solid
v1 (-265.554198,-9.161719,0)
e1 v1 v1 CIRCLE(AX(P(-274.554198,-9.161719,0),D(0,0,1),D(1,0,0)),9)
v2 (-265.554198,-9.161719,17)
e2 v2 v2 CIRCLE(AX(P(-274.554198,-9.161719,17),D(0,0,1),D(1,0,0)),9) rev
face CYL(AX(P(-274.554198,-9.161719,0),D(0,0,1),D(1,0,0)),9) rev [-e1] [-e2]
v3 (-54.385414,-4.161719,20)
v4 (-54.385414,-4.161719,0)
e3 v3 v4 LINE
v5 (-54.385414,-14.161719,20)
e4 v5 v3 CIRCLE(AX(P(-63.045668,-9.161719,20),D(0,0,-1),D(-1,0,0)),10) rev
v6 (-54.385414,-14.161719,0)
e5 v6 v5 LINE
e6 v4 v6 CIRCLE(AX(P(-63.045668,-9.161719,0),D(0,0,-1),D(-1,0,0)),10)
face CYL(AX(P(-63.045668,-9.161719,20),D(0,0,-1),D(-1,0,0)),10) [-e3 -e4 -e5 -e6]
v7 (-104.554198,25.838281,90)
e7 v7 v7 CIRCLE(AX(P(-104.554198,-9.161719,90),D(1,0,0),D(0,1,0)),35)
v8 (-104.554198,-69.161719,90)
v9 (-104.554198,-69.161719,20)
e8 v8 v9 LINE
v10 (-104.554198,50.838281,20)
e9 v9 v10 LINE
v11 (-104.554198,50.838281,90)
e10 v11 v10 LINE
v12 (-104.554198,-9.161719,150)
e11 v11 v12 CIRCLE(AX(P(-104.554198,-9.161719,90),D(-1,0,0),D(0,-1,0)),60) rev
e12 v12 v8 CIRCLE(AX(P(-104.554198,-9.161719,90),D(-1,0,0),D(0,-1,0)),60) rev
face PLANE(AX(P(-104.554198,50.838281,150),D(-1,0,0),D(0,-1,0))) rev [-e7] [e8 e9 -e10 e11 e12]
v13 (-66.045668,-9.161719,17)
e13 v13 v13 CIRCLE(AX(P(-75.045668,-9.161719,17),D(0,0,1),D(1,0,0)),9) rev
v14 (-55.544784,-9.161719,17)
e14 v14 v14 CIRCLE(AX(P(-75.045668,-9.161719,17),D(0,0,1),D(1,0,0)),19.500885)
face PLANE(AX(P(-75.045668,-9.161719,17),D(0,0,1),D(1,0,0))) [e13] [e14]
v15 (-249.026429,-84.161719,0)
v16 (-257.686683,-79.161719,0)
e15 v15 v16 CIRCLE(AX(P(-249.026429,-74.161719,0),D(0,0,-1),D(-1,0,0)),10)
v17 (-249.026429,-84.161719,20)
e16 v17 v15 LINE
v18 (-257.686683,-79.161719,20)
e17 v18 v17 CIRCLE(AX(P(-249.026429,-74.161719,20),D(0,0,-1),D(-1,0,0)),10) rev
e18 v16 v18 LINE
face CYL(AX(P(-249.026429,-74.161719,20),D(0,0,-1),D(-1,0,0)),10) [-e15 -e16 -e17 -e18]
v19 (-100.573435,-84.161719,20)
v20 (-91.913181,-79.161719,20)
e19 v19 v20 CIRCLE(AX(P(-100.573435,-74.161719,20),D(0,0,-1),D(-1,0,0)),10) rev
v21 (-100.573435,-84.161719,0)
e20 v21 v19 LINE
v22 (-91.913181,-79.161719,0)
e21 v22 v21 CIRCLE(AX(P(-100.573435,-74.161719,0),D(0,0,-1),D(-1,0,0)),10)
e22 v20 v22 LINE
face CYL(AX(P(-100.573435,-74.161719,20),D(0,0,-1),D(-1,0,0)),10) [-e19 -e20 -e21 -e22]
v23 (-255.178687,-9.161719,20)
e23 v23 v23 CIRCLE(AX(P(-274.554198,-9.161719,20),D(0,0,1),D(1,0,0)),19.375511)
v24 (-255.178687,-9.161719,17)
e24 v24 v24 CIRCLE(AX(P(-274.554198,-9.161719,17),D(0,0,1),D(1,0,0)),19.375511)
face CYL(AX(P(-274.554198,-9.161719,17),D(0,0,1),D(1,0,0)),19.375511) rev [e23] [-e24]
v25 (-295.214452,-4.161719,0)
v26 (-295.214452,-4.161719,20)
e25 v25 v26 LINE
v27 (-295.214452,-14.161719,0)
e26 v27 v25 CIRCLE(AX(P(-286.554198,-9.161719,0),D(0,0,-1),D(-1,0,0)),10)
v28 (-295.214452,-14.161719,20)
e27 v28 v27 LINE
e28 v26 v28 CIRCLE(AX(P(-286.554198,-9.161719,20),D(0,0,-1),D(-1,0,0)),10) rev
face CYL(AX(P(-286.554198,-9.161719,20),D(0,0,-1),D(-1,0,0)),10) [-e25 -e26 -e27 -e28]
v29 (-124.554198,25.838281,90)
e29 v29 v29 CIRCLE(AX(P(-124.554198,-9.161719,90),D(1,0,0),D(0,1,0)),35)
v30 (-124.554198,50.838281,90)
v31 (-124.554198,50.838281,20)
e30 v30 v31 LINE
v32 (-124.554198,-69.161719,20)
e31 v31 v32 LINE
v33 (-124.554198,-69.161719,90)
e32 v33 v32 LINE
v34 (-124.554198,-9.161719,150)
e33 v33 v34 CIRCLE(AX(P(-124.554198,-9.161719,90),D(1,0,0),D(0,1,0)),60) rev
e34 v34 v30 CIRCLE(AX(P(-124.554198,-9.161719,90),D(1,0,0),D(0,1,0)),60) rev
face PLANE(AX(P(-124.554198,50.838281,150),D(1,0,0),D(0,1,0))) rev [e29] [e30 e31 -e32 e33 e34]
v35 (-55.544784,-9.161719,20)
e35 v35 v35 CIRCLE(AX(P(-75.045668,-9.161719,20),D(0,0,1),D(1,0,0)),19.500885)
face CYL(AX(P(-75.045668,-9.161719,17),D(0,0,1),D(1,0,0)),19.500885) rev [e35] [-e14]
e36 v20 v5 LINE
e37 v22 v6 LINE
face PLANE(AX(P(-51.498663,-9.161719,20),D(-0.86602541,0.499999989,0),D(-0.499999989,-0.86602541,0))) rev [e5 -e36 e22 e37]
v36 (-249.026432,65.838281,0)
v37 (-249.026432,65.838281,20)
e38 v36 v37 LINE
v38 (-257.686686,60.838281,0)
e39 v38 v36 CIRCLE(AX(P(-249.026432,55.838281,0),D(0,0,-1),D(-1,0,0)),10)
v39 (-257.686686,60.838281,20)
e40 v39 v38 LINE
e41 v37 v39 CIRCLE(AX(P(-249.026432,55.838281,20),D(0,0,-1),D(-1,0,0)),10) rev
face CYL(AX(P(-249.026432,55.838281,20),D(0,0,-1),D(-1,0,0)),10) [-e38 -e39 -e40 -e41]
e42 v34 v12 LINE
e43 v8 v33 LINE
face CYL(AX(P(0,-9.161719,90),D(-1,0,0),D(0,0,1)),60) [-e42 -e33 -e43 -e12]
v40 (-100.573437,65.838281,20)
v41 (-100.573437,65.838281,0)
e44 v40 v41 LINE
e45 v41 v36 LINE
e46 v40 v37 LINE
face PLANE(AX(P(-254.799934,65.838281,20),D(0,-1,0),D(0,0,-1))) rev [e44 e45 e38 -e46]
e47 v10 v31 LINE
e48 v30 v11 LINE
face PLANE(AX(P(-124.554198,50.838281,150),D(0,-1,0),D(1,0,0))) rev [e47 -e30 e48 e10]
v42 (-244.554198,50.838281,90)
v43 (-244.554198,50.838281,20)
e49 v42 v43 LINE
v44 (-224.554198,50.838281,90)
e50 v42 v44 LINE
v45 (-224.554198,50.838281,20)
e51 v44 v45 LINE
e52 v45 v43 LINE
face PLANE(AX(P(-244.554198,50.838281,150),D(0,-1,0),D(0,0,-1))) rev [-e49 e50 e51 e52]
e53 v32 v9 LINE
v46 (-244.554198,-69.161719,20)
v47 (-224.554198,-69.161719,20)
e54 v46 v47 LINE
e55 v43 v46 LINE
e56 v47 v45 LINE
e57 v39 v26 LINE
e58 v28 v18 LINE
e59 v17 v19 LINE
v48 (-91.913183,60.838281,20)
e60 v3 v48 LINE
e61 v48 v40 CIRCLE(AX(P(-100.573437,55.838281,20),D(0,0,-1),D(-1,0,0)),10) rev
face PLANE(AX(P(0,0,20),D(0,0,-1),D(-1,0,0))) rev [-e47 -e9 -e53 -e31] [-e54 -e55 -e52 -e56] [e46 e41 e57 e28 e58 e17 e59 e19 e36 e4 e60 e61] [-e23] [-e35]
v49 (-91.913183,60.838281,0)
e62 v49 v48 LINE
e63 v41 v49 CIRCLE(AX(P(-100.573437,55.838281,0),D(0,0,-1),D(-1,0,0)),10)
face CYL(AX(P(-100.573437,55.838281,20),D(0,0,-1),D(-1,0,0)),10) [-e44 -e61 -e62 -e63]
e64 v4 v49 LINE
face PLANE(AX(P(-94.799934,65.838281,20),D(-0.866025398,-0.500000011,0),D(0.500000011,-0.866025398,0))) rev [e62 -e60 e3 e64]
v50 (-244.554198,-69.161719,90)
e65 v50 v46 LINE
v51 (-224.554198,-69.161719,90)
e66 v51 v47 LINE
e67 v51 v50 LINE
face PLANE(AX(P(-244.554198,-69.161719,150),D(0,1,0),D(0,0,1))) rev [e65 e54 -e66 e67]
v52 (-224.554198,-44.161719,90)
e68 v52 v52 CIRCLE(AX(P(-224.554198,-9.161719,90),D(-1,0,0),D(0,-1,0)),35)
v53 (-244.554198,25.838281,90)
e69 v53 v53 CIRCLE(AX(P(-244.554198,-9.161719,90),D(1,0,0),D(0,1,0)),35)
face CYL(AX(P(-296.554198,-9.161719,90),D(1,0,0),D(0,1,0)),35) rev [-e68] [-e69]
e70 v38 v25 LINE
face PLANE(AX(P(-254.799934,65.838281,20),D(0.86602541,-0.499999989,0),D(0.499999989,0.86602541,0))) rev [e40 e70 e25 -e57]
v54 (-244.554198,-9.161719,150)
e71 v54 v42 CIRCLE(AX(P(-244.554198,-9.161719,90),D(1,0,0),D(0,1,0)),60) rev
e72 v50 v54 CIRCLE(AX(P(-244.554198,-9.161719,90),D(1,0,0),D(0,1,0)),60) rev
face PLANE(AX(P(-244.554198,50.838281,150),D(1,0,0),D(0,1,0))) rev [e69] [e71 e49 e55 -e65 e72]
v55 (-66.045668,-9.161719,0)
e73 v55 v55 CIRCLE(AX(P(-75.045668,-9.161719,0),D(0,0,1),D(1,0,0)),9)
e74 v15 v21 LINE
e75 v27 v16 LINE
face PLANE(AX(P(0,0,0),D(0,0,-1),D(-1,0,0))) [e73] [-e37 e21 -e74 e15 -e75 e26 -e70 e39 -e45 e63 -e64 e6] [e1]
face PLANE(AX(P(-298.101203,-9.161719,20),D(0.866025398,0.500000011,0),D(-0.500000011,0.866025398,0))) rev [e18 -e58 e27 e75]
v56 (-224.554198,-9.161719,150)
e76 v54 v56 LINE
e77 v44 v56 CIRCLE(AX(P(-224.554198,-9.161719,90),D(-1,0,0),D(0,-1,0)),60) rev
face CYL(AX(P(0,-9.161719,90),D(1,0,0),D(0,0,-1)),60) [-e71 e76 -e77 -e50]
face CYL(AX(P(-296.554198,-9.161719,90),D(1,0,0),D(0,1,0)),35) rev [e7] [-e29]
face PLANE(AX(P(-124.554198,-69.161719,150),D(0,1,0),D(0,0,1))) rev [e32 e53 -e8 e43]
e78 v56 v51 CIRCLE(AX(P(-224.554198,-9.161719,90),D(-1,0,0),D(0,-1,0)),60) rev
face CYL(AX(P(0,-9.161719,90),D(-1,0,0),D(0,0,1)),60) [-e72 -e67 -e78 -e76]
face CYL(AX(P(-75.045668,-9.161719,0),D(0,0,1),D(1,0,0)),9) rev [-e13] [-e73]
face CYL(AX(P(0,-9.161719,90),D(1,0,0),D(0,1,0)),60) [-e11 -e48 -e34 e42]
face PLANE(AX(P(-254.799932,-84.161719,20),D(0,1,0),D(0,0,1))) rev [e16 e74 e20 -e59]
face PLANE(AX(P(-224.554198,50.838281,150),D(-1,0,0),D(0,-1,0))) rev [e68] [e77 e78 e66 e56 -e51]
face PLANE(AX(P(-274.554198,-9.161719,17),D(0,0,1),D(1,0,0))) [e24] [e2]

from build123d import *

# Parameters (mm, degrees)
BOSS_EXTRU_1_DEPTH      = 20
CONG_1_R                = 10
CONG_2_R                = 10
CONG_3_R                = 10
CONG_4_R                = 10
CONG_5_R                = 10
CONG_7_R                = 10
ESQUISSE2_W             = 20
ESQUISSE2_H             = 120
BOSS_EXTRU_2_DEPTH      = 130
CONG_8_R                = 60
CONG_9_R                = 60
CONG_10_R               = 60
CONG_11_R               = 60
ESQUISSE3_R             = 35
ENL_V_MAT_EXTRU_1_DEPTH = 258.77353424
ESQUISSE4_R             = 9
ENL_V_MAT_EXTRU_2_DEPTH = 335.555805948
ESQUISSE5_R             = 19.375511008
ESQUISSE5_R_2           = 19.500884668
ENL_V_MAT_EXTRU_3_DEPTH = 3


with BuildPart() as part:
    # Esquisse1 → Boss.-Extru.1 (new body)
    with BuildSketch(Plane.XY):
        Polygon((-254.799934421, 65.838280942), (-298.101203362, -9.161719058), (-254.799931925, -84.161719058), (-94.799931925, -84.161719058), (-51.498662984, -9.161719058), (-94.799934421, 65.838280942), align=None)
    extrude(amount=BOSS_EXTRU_1_DEPTH)

    # Congé1
    cong_1_edges = [part.edges().sort_by_distance(p)[0] for p in [
        (-94.799934421, 65.838280942, 10),
    ]]
    fillet(cong_1_edges, radius=CONG_1_R)

    # Congé2
    cong_2_edges = [part.edges().sort_by_distance(p)[0] for p in [
        (-254.799934421, 65.838280942, 10),
    ]]
    fillet(cong_2_edges, radius=CONG_2_R)

    # Congé3
    cong_3_edges = [part.edges().sort_by_distance(p)[0] for p in [
        (-298.101203362, -9.161719058, 10),
    ]]
    fillet(cong_3_edges, radius=CONG_3_R)

    # Congé4
    cong_4_edges = [part.edges().sort_by_distance(p)[0] for p in [
        (-254.799931925, -84.161719058, 10),
    ]]
    fillet(cong_4_edges, radius=CONG_4_R)

    # Congé5
    cong_5_edges = [part.edges().sort_by_distance(p)[0] for p in [
        (-94.799931925, -84.161719058, 10),
    ]]
    fillet(cong_5_edges, radius=CONG_5_R)

    # Congé7
    cong_7_edges = [part.edges().sort_by_distance(p)[0] for p in [
        (-51.498662984, -9.161719058, 10),
    ]]
    fillet(cong_7_edges, radius=CONG_7_R)

    # Esquisse2 → Boss.-Extru.2 (add)
    with BuildSketch(Plane.XY.offset(20)):
        with Locations((-234.554197979, -9.161719058)):
            Rectangle(ESQUISSE2_W, ESQUISSE2_H)
        with Locations((-114.554197979, -9.161719058)):
            Rectangle(ESQUISSE2_W, ESQUISSE2_H)
    extrude(amount=BOSS_EXTRU_2_DEPTH)

    # Congé8
    cong_8_edges = [part.edges().sort_by_distance(p)[0] for p in [
        (-114.554197979, -69.161719058, 150),
    ]]
    fillet(cong_8_edges, radius=CONG_8_R)

    # Congé9
    cong_9_edges = [part.edges().sort_by_distance(p)[0] for p in [
        (-114.554197979, 50.838280942, 150),
    ]]
    fillet(cong_9_edges, radius=CONG_9_R - 0.0001)  # a hair under: the kernel refuses the full size

    # Congé10
    cong_10_edges = [part.edges().sort_by_distance(p)[0] for p in [
        (-234.554197979, -69.161719058, 150),
    ]]
    fillet(cong_10_edges, radius=CONG_10_R)

    # Congé11
    cong_11_edges = [part.edges().sort_by_distance(p)[0] for p in [
        (-234.554197979, 50.838280942, 150),
    ]]
    fillet(cong_11_edges, radius=CONG_11_R - 0.0001)  # a hair under: the kernel refuses the full size

    # Esquisse3 → Enlèv. mat.-Extru.1 (cut, through all)
    with BuildSketch(Plane(origin=(-104.554197979, 0, 0), x_dir=(0, 0, -1), z_dir=(1, 0, 0))):
        with Locations(Location((-90, -9.161719058, 0), (0, 0, 90))):
            Circle(ESQUISSE3_R)
    extrude(amount=-ENL_V_MAT_EXTRU_1_DEPTH, mode=Mode.SUBTRACT)

    # Esquisse4 → Enlèv. mat.-Extru.2 (cut, through all)
    with BuildSketch(Plane.XY.offset(20)):
        with Locations((-274.554197979, -9.161719058)):
            Circle(ESQUISSE4_R)
        with Locations((-75.045668368, -9.161719084)):
            Circle(ESQUISSE4_R)
    extrude(amount=-ENL_V_MAT_EXTRU_2_DEPTH, mode=Mode.SUBTRACT)

    # Esquisse5 → Enlèv. mat.-Extru.3 (cut)
    with BuildSketch(Plane.XY.offset(20)):
        with Locations((-274.554197979, -9.161719058)):
            Circle(ESQUISSE5_R)
        with Locations((-75.045668368, -9.161719084)):
            Circle(ESQUISSE5_R_2)
    extrude(amount=-ENL_V_MAT_EXTRU_3_DEPTH, mode=Mode.SUBTRACT)


solid = part.part
